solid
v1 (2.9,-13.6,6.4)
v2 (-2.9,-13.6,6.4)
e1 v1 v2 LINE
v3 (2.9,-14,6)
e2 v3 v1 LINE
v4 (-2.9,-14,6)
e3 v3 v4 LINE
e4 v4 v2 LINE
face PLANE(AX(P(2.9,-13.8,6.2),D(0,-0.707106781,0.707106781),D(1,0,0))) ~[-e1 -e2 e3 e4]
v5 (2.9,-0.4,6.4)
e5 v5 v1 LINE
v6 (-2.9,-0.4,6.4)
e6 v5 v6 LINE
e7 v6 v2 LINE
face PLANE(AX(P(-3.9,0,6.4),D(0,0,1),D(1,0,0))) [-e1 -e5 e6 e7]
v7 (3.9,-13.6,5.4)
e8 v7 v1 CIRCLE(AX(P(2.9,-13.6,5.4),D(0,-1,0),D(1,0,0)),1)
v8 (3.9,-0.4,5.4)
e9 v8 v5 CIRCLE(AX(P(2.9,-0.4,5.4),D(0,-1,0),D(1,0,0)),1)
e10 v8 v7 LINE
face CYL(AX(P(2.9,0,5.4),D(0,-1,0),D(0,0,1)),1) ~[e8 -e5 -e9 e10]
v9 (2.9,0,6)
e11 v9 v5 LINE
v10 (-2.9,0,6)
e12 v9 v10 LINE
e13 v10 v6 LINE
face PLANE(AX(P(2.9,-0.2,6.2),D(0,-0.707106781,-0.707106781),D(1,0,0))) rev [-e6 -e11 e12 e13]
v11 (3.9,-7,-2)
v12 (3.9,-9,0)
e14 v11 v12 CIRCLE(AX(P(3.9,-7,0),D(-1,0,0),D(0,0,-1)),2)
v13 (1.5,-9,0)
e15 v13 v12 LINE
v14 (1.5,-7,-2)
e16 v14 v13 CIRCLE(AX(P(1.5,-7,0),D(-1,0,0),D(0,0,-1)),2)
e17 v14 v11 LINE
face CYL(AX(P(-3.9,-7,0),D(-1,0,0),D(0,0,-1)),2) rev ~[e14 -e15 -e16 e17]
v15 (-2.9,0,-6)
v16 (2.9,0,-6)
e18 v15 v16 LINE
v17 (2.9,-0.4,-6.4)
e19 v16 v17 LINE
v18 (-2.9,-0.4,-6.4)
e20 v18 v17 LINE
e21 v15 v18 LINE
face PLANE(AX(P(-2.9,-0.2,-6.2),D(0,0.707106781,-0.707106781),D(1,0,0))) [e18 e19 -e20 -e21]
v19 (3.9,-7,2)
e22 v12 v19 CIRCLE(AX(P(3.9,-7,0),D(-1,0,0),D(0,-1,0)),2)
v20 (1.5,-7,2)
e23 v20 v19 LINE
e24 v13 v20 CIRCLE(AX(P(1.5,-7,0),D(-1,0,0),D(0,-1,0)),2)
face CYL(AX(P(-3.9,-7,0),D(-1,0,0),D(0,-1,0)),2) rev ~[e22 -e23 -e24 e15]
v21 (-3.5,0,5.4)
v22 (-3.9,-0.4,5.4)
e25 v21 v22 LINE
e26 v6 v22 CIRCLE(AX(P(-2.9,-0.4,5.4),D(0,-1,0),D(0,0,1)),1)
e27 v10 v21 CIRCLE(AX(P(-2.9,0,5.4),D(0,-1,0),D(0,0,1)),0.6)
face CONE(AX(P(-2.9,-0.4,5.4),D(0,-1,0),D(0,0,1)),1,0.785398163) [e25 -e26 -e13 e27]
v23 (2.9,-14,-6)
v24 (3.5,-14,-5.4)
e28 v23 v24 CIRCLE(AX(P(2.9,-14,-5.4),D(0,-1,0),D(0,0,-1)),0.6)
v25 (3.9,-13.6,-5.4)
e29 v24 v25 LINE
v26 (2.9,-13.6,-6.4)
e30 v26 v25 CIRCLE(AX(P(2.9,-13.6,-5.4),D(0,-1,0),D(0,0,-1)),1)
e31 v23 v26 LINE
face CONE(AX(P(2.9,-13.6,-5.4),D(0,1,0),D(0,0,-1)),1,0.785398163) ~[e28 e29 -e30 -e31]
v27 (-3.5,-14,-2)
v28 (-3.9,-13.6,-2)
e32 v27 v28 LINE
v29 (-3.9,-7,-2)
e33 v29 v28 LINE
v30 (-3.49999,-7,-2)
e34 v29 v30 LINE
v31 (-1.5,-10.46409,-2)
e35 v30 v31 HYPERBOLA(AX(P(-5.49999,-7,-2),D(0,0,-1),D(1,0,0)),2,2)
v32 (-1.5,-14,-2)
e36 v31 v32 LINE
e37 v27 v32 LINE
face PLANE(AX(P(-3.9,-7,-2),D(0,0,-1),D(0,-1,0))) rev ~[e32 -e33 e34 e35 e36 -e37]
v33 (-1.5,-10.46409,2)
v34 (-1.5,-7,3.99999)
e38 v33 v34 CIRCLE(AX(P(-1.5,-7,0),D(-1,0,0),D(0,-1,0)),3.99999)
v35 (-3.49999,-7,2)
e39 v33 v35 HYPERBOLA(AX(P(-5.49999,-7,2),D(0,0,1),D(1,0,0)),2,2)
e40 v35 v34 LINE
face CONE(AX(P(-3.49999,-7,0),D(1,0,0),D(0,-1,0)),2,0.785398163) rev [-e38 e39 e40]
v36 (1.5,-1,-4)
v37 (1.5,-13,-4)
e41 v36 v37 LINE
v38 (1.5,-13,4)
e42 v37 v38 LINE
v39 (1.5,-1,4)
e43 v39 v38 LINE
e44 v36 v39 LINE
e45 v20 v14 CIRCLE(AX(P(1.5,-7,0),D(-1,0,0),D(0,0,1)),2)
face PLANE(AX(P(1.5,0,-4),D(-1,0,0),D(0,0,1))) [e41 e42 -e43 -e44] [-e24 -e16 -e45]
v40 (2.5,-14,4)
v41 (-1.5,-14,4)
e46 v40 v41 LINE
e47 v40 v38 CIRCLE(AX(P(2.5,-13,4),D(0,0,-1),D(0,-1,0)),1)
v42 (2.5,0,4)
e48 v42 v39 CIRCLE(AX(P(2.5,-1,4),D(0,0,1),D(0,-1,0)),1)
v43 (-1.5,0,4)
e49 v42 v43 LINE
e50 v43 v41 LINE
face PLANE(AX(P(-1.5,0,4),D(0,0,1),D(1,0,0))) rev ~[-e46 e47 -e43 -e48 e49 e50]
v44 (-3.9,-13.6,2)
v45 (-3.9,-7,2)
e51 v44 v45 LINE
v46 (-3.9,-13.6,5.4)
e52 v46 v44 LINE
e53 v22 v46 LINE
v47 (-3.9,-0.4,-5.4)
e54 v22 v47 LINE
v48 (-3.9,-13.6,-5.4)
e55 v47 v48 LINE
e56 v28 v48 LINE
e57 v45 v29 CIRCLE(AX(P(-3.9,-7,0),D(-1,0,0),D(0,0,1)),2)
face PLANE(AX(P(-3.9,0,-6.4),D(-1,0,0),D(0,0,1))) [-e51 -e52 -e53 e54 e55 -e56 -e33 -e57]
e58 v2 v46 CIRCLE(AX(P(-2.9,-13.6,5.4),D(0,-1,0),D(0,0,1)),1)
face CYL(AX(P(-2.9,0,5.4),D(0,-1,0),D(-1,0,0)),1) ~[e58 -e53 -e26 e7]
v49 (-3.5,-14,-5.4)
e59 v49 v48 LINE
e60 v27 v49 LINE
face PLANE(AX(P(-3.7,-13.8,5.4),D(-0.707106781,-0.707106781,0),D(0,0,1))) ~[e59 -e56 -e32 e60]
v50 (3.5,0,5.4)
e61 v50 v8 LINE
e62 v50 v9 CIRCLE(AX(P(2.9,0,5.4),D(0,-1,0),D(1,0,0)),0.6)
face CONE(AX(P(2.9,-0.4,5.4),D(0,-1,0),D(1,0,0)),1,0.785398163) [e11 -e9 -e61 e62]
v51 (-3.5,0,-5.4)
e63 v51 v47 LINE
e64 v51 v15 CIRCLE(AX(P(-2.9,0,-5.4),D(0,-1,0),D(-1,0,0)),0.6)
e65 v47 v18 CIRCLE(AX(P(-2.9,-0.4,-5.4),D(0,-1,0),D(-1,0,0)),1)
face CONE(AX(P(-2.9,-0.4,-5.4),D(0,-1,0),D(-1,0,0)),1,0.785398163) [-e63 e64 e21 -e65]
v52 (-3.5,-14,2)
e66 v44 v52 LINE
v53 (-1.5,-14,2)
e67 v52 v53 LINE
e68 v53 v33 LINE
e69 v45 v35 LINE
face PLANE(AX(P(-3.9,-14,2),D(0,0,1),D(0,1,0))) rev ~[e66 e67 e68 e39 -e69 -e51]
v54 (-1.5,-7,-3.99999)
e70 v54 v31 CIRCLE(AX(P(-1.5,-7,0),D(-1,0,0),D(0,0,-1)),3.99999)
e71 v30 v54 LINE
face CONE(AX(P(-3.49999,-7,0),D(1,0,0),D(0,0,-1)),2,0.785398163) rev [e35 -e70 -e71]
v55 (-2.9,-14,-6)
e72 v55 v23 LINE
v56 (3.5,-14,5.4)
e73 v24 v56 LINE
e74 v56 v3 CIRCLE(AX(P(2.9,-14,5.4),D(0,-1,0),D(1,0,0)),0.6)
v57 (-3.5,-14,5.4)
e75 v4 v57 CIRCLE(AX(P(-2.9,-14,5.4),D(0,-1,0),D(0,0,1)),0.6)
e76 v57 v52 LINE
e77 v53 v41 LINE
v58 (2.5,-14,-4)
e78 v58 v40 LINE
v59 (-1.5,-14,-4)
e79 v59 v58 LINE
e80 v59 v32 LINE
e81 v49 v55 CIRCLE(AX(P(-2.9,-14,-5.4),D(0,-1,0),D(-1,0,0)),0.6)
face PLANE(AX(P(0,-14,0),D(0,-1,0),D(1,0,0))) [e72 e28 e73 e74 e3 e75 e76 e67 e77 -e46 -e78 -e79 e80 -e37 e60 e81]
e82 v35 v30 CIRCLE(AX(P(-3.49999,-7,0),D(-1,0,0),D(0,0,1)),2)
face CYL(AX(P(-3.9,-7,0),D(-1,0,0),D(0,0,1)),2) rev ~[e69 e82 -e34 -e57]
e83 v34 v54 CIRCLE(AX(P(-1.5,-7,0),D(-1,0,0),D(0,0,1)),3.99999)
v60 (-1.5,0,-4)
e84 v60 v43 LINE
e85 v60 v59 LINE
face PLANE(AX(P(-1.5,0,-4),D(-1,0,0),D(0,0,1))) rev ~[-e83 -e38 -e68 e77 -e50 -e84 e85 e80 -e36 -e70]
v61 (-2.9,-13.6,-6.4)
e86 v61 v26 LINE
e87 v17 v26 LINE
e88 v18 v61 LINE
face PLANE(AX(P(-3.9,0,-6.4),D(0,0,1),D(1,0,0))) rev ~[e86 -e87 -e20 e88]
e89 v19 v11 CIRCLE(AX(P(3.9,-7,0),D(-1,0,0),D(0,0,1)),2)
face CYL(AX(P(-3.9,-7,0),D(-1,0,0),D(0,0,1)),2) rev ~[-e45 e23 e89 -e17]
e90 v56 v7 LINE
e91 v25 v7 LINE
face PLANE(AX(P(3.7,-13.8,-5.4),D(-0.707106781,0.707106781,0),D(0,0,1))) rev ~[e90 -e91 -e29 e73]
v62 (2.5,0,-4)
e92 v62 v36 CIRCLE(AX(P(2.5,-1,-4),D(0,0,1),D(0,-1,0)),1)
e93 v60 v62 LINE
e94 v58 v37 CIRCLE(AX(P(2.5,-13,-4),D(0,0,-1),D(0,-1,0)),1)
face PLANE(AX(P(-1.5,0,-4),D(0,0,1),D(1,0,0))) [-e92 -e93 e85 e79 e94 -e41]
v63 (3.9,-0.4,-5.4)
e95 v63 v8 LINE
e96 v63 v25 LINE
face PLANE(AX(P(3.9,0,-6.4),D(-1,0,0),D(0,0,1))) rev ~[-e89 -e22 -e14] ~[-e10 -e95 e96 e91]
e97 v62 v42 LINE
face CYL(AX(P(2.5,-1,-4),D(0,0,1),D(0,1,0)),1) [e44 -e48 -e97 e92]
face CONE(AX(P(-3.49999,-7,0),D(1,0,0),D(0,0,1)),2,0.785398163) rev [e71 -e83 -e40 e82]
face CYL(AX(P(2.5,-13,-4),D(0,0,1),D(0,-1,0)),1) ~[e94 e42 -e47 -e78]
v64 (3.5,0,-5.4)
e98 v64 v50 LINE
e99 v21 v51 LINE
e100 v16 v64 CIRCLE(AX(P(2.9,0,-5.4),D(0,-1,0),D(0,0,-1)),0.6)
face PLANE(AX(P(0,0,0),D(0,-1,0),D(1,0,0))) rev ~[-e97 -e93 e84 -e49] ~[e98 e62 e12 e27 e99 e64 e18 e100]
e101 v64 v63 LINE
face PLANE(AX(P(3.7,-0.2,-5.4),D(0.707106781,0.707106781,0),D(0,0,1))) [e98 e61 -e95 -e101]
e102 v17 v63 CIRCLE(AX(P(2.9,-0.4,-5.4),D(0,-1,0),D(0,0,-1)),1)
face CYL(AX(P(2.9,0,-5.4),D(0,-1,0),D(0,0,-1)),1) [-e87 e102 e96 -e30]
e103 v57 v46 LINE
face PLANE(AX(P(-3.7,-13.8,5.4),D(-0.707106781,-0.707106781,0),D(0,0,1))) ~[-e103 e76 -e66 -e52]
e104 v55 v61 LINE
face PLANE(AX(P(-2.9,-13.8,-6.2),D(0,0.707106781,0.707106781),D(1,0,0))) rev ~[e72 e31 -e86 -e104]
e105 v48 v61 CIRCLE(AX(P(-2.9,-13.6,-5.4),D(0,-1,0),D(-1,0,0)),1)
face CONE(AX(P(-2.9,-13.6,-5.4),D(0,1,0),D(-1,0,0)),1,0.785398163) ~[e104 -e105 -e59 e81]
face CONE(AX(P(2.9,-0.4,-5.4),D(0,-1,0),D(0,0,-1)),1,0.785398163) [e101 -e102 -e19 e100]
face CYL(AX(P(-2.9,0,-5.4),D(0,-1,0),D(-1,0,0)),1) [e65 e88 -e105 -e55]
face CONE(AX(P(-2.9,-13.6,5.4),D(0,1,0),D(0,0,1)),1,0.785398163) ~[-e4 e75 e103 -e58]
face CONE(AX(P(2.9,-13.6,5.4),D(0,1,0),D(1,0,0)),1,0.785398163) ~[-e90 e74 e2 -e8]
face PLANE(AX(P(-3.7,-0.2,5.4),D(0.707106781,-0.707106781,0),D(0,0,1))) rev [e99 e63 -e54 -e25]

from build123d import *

# Parameters (mm, degrees)
F0_W     = 7.8
F0_H     = 12.8
F0_W_2   = 3
F0_H_2   = 8
F1_DEPTH = 14
F3_DEPTH = 7.801
F4_SIZE  = 1.99999
F5_R     = 1
F6_SIZE  = 0.4
F7_R     = 1
F8_DEPTH = 2.4


# Not quite as in the source:
# - a fillet or chamfer is up to 0.001 mm smaller than in the source, because OpenCascade refuses the exact size


with BuildPart() as f1:
    # F0 (on Front) → F1 (new body)
    with BuildSketch(Plane.XZ):
        Rectangle(F0_W, F0_H)
        Rectangle(F0_W_2, F0_H_2, mode=Mode.SUBTRACT)
    extrude(amount=F1_DEPTH)

    # F2 (on face) → F3 (cut, through all)
    with BuildSketch(Plane(origin=(-3.9, 0, 0), x_dir=(0, -1, 0), z_dir=(-1, 0, 0))):
        with BuildLine():
            Line((7, -2), (7, 2))
            ThreePointArc((7, 2), (5, 0), (7, -2))
        make_face()
        with BuildLine():
            ThreePointArc((7, -2), (8.4142135624, -1.4142135624), (9, 0))
            ThreePointArc((9, 0), (8.4142135624, 1.4142135624), (7, 2))
            Line((7, 2), (7, -2))
        make_face()
    extrude(amount=-F3_DEPTH, mode=Mode.SUBTRACT)

    # F4 (size 2 in the source; OpenCascade refuses exactly that, so slightly less here)
    f4_edges = [f1.edges().sort_by_distance(p)[0] for p in [
        (-1.5, -7, 2),
    ]]
    chamfer(f4_edges, length=F4_SIZE)

    # F5
    f5_edges = [f1.edges().sort_by_distance(p)[0] for p in [
        (3.9, -7, 6.4),
        (3.9, -7, -6.4),
        (-3.9, -7, -6.4),
        (-3.9, -7, 6.4),
    ]]
    fillet(f5_edges, radius=F5_R)

    # F6
    f6_edges = [f1.edges().sort_by_distance(p)[0] for p in [
        (3.9, -14, 0),
        (3.9, 0, 0),
    ]]
    chamfer(f6_edges, length=F6_SIZE)

    # F7
    f7_edges = [f1.edges().sort_by_distance(p)[0] for p in [
        (1.5, -14, 0),
        (1.5, 0, 0),
    ]]
    fillet(f7_edges, radius=F7_R)

    # F2 (on face) → F8 (cut, through all)
    with BuildSketch(Plane(origin=(-3.9, 0, 0), x_dir=(0, -1, 0), z_dir=(-1, 0, 0))):
        with BuildLine():
            ThreePointArc((7, 2), (8.4142135624, 1.4142135624), (9, 0))
            ThreePointArc((9, 0), (8.4142135624, -1.4142135624), (7, -2))
            Line((7, -2), (14, -2))
            Line((14, -2), (14, 2))
            Line((14, 2), (7, 2))
        make_face()
    extrude(amount=-F8_DEPTH, mode=Mode.SUBTRACT)


solid = f1.part
